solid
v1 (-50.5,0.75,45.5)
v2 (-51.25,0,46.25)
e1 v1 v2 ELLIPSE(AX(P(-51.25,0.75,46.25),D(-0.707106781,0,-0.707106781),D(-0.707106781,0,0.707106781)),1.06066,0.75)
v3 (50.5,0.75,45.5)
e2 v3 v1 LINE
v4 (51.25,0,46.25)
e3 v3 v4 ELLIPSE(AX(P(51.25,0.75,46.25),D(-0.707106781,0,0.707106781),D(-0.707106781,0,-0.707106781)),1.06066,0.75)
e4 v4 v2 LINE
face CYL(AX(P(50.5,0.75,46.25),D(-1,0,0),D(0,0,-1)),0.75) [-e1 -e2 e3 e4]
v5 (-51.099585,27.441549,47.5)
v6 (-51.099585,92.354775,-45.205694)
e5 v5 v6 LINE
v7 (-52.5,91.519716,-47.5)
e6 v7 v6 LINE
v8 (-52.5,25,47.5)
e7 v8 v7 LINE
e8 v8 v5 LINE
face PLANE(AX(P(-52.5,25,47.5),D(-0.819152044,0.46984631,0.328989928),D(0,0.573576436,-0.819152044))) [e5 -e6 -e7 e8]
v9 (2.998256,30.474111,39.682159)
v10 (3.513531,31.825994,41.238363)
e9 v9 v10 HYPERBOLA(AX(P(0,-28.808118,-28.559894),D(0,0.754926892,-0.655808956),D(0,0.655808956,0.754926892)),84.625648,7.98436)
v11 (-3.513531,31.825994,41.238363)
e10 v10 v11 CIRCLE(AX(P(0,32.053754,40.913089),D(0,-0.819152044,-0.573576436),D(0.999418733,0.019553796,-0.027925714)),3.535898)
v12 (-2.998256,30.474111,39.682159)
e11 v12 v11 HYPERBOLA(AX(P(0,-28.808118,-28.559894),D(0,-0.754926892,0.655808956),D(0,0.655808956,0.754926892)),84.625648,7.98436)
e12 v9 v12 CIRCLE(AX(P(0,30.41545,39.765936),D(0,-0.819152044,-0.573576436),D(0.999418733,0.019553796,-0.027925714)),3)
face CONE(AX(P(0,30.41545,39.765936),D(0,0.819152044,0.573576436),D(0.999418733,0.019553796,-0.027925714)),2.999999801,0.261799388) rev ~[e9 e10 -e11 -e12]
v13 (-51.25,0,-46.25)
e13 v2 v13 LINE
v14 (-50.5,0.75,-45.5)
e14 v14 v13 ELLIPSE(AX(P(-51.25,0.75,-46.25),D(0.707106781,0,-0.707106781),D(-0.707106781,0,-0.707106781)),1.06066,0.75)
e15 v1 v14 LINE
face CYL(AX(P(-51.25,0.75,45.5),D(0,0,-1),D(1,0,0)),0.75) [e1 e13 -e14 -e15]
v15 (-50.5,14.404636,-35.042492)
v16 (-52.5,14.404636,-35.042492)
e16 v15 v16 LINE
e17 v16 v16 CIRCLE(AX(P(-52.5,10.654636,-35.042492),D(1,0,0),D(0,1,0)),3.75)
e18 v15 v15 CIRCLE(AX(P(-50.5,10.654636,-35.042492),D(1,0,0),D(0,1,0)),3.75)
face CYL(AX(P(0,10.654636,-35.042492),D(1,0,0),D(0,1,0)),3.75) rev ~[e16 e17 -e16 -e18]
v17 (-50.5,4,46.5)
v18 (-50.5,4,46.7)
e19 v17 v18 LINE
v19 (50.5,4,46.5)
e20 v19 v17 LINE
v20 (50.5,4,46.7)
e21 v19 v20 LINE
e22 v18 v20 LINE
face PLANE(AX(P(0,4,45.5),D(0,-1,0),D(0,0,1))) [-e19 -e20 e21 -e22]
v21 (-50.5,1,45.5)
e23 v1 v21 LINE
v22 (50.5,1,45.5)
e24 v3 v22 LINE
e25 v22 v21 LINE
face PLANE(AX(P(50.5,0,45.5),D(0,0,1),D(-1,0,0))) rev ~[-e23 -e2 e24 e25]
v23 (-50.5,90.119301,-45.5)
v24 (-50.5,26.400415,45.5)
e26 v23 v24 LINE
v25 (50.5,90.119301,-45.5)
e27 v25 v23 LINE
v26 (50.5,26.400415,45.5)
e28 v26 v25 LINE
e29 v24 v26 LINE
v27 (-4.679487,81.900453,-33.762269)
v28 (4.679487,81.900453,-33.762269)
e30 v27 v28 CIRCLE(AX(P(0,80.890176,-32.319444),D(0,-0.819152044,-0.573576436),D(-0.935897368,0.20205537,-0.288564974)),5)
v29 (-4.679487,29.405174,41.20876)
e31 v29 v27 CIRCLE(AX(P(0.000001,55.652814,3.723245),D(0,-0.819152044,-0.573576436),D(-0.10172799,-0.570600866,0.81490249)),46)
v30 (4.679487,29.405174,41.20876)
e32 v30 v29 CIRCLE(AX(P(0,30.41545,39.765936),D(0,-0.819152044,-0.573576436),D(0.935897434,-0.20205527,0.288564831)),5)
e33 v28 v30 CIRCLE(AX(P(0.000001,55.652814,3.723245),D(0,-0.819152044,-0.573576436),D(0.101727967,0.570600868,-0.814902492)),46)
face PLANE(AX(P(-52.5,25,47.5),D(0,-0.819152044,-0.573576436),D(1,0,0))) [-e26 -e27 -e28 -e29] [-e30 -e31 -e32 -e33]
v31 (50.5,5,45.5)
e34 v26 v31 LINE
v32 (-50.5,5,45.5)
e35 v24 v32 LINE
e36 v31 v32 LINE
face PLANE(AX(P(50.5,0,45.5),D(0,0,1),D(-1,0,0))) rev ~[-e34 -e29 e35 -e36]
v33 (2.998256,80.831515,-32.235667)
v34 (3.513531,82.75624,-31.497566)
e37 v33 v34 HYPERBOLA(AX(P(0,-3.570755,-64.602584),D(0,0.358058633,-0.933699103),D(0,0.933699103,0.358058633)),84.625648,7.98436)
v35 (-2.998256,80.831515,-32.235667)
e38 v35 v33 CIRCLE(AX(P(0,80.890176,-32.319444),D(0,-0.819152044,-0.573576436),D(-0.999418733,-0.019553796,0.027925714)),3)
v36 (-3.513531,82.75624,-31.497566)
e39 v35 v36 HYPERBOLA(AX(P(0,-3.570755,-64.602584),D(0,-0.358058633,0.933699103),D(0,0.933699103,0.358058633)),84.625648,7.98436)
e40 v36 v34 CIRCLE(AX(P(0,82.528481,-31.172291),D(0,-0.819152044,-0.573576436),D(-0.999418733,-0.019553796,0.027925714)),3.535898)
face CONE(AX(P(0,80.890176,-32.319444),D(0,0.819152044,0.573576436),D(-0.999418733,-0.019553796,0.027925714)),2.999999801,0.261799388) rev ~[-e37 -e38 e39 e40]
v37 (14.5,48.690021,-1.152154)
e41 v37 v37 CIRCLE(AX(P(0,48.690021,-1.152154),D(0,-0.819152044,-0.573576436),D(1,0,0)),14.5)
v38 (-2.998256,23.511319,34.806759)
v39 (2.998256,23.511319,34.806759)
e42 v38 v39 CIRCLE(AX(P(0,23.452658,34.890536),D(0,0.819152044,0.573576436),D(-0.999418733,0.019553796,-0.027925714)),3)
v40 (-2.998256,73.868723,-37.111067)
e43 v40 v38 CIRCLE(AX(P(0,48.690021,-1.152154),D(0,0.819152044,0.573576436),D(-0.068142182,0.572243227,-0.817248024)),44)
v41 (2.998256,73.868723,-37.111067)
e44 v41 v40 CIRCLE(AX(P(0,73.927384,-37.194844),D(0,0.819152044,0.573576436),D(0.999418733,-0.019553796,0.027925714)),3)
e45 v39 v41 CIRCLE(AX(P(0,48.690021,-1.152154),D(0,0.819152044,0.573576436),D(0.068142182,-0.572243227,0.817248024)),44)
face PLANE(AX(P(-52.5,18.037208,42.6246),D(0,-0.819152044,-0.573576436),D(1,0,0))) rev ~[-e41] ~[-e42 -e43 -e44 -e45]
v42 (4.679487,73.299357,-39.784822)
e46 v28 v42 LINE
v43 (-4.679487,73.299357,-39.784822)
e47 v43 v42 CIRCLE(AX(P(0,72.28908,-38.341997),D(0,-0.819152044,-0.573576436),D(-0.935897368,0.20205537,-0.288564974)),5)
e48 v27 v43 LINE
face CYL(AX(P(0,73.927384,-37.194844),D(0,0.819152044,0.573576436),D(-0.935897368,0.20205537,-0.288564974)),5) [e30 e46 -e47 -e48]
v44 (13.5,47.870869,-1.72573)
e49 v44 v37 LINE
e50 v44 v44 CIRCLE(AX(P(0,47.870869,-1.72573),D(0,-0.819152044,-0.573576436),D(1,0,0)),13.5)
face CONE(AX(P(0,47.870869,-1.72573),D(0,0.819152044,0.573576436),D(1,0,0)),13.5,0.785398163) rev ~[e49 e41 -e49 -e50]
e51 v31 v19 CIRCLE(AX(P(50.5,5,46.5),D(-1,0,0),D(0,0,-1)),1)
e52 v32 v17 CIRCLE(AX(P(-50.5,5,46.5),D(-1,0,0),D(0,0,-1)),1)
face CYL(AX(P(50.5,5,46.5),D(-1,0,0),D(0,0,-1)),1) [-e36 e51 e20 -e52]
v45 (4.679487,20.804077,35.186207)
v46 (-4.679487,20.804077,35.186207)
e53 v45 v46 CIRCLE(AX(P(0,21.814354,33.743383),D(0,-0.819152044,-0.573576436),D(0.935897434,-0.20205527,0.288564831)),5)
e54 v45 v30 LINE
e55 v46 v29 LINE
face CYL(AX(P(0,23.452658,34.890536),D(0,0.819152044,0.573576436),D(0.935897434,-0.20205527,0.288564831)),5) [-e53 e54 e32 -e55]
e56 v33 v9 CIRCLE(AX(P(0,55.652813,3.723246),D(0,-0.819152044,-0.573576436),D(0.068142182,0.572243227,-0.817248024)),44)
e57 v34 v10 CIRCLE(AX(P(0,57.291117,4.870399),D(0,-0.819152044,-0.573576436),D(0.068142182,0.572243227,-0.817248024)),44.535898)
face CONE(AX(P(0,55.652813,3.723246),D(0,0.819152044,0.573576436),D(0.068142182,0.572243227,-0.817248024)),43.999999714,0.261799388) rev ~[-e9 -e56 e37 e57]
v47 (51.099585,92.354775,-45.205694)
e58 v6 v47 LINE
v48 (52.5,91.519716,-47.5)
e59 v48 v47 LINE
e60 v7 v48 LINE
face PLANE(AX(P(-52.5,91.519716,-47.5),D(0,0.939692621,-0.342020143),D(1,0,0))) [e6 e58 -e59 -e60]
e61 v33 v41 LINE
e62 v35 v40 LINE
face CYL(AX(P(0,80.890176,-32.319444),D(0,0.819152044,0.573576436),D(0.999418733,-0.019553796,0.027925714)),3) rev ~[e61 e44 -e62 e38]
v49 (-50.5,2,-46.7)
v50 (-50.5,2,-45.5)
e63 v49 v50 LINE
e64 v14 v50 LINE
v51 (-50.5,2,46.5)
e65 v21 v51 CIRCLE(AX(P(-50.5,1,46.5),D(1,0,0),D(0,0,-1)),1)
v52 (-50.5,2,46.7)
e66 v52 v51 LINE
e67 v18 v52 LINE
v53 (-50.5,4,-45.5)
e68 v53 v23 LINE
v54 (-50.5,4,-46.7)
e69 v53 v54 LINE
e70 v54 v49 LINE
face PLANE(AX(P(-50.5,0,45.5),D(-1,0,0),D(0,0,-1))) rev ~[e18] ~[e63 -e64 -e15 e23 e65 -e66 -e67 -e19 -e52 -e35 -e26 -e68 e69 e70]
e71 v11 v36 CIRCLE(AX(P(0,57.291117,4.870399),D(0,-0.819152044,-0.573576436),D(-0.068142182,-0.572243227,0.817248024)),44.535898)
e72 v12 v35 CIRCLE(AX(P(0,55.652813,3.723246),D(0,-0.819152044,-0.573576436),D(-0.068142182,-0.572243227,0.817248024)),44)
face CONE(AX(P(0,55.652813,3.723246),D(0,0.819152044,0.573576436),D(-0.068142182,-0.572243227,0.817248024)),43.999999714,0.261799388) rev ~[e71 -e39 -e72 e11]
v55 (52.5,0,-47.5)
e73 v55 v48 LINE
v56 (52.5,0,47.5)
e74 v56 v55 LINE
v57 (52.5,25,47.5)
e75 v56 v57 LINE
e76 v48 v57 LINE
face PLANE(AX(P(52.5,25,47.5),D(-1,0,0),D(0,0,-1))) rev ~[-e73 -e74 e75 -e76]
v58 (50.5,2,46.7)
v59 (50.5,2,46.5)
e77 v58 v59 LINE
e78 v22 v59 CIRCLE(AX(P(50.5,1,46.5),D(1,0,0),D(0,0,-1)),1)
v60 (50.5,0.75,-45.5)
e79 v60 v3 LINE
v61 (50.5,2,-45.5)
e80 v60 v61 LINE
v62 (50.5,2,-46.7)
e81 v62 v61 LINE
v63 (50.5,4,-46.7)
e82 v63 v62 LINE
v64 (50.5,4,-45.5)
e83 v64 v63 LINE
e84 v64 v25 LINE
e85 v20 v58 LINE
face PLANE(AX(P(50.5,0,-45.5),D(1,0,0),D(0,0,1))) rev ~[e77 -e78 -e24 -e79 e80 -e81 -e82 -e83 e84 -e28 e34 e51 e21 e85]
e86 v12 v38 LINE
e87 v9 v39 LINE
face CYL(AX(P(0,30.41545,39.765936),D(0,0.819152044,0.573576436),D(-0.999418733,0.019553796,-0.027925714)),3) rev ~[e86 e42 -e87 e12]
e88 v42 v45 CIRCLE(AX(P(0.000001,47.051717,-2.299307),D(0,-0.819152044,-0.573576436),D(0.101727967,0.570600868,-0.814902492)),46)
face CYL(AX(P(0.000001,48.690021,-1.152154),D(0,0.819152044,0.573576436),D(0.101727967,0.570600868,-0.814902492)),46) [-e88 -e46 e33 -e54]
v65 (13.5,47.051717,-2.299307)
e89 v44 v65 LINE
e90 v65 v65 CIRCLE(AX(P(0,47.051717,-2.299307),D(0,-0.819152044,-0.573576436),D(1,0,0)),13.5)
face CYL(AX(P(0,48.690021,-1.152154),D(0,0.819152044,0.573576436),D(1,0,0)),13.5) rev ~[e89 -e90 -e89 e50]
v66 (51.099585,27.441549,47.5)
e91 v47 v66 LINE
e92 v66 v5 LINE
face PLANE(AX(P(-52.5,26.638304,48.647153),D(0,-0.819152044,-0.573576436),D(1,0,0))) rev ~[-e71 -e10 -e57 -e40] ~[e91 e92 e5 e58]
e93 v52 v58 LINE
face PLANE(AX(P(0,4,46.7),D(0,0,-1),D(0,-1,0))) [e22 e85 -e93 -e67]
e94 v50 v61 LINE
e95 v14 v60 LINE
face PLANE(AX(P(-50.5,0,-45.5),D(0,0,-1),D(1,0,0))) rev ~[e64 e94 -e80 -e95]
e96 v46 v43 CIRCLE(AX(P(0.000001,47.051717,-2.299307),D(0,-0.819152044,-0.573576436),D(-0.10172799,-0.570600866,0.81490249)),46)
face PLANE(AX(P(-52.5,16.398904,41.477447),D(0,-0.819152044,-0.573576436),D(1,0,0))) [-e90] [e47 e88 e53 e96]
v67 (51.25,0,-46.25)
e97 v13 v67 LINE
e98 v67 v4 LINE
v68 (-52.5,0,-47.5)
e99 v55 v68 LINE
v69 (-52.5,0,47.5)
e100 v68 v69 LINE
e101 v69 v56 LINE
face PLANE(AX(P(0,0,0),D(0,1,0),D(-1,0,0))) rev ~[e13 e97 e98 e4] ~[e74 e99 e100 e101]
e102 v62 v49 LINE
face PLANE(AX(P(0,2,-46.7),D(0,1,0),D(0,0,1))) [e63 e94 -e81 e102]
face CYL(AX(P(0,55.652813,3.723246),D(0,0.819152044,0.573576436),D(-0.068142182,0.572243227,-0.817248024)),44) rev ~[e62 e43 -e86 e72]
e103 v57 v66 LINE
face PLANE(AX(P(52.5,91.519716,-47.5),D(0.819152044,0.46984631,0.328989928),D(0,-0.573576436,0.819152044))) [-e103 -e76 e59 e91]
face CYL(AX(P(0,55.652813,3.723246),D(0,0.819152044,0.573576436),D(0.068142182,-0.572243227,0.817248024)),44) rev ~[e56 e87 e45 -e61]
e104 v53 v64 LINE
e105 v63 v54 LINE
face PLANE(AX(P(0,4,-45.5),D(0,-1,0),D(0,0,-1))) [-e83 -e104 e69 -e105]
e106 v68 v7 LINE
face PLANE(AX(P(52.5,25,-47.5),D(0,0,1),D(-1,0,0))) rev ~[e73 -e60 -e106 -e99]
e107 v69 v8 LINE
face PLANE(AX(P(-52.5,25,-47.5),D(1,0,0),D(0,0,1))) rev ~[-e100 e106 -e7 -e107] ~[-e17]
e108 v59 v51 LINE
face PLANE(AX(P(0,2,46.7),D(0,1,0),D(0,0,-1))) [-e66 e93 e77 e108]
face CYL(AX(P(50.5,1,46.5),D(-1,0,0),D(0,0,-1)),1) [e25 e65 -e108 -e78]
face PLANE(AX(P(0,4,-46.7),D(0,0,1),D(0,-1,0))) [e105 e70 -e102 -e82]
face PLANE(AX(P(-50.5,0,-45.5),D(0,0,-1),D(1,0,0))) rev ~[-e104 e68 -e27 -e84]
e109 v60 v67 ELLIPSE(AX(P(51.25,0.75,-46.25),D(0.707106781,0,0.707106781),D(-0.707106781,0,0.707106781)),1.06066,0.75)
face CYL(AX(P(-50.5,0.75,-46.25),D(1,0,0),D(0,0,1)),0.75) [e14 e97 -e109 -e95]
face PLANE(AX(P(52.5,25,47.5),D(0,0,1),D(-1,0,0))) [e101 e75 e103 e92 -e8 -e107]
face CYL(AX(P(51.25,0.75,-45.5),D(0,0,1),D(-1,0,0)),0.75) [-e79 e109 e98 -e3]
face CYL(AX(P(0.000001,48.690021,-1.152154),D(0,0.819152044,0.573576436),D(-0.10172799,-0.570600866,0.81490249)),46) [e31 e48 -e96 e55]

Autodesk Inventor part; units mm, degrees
ref_plane "YZ Plane" through (0, 0, 0) normal (1, 0, 0) x (0, 1, 0)
ref_plane "XZ Plane" through (0, 0, 0) normal (0, 1, 0) x (-1, 0, 0)
sketch "XZ_master" plane through (0, 0, 0) normal (0, 1, 0) x (-1, 0, 0)
  line L0 (52.5, -47.5) -> (-52.5, -47.5)
  line L1 (-52.5, -47.5) -> (-52.5, 47.5)
  line L2 (-52.5, 47.5) -> (52.5, 47.5)
  line L3 (52.5, 47.5) -> (52.5, -47.5)
  line L4 (52.5, -47.5) -> (-52.5, 47.5) construction
  line L5 (-52.5, -47.5) -> (52.5, 47.5) construction
  line L6 (50.5, -45.5) -> (-50.5, -45.5)
  line L7 (-50.5, -45.5) -> (-50.5, 45.5)
  line L8 (-50.5, 45.5) -> (50.5, 45.5)
  line L9 (50.5, 45.5) -> (50.5, -45.5)
  point P0 (0, 0)
  dimension "d0" = 105
  dimension "d1" = 95
  dimension "d2" = 2
sketch "XZ_master outline for Walls_bottom" plane through (0, 0, 0) normal (0, 1, 0) x (-1, 0, 0)
  line L0 (52.5, -47.5) -> (52.5, 47.5)
  line L1 (-52.5, -47.5) -> (52.5, -47.5)
  line L2 (52.5, 47.5) -> (-52.5, 47.5)
  line L3 (-52.5, 47.5) -> (-52.5, -47.5)
  line L4 (50.5, -45.5) -> (-50.5, -45.5)
  line L5 (50.5, 45.5) -> (50.5, -45.5)
  line L6 (-50.5, 45.5) -> (50.5, 45.5)
  line L7 (-50.5, -45.5) -> (-50.5, 45.5)
extrude "Walls_bottom" add sketch "XZ_master outline for Walls_bottom" along normal blind 25
fillet "Fillet2" radius 0.75 4 edges at (0, 0, 45.5) (50.5, 0, 0) (-50.5, 0, 0) (0, 0, -45.5)
sketch "Profile" plane through (0, 0, 0) normal (1, 0, 0) x (0, 1, 0)
  line L0 (0, 45.5) -> (25, 45.5)
  line L1 (2, 45.5) -> (4, 45.5)
  line L2 (4, 45.5) -> (4, 46.7)
  line L3 (4, 46.7) -> (2, 46.7)
  line L4 (2, 46.7) -> (2, 45.5)
  line L5 (0, -47.5) -> (0, 47.5)
  circle A0 centre (10.654636, -35.042492) radius 3.75
  line L6 (4, 46.7) -> (4, -38.2) construction
  line L7 (4, 46.7) -> (88.9, 46.7) construction
  point P0 (0, 0)
  dimension "d5" = 2
  dimension "d6" = 1.2
  dimension "d7" = 2
  dimension "d27" = 7.5
  dimension "d30" = 90
sketch "Profile outline for Lip recess" plane through (0, 0, 0) normal (1, 0, 0) x (0, 1, 0)
  line L0 (4, 46.7) -> (2, 46.7)
  line L1 (4, 45.5) -> (4, 46.7)
  line L2 (2, 45.5) -> (4, 45.5)
  line L3 (2, 46.7) -> (2, 45.5)
extrude "Lip recess" cut sketch "Profile outline for Lip recess" along normal mid plane 101
fillet "Lip_fillet" radius 1 2 edges at (0, 4, 45.5) (0, 2, 45.5)
pattern_circular "Circular Pattern1" count 2 over 360 about axis through (0, -10, 0) along (0, 1, 0) of "Lip recess"
ref_plane "Angled_top_face" through (-52.5, 25, 47.5) normal (0, -0.819152, -0.5735764) x (1, 0, 0)
sketch "XZ_master outline for Walls_to_workplane" plane through (0, 0, 0) normal (0, 1, 0) x (-1, 0, 0)
  line L0 (52.5, -47.5) -> (52.5, 47.5)
  line L1 (-52.5, -47.5) -> (52.5, -47.5)
  line L2 (52.5, 47.5) -> (-52.5, 47.5)
  line L3 (-52.5, 47.5) -> (-52.5, -47.5)
  line L4 (50.5, -45.5) -> (-50.5, -45.5)
  line L5 (50.5, 45.5) -> (50.5, -45.5)
  line L6 (-50.5, 45.5) -> (50.5, 45.5)
  line L7 (-50.5, -45.5) -> (-50.5, 45.5)
extrude "Walls_to_workplane" add sketch "XZ_master outline for Walls_to_workplane" along normal up to surface from surface at 25 surface through (-52.5, 25, 47.5) normal (0, -0.819152, -0.5735764)
sketch "Top_face" plane through (-52.5, 25, 47.5) normal (0, -0.819152, -0.5735764) x (1, 0, 0)
  line L0 (105, -115.973586) -> (0, -115.973586)
  line L1 (0, 0) -> (105, 0)
  line L2 (105, 0) -> (105, -115.973586)
  line L3 (105, -115.973586) -> (0, -115.973586)
  line L4 (0, -115.973586) -> (0, 0)
  line L5 (0, -115.973586) -> (0, 0) construction
  line L6 (2, -2.441549) -> (2, -113.532037)
  line L7 (2, -113.532037) -> (103, -113.532037)
  line L8 (103, -113.532037) -> (103, -2.441549)
  line L9 (103, -2.441549) -> (2, -2.441549)
  line L10 (105, 0) -> (105, -115.973586)
  line L11 (105, -115.973586) -> (0, -115.973586)
  line L12 (0, -115.973586) -> (0, 0)
  line L13 (0, 0) -> (105, 0)
  line L14 (2, -113.532037) -> (103, -113.532037) construction
  line L15 (52.5, -113.532037) -> (52.5, -2.441549) construction
  line L16 (103, -2.441549) -> (2, -2.441549) construction
  circle A0 centre (52.5, -53.441549) radius 44
  circle A1 centre (52.5, -97.441549) radius 3
  circle A2 centre (52.5, -9.441549) radius 3
  circle A3 centre (52.5, -53.441549) radius 46
  circle A4 centre (52.5, -97.441549) radius 5
  circle A5 centre (52.5, -9.441549) radius 5
  circle A6 centre (52.5, -53.441549) radius 13.5
  circle A7 centre (52.5, -53.441549) radius 51 construction
  point P0 (55.498256, -97.339276)
  point P1 (55.498256, -9.543822)
  point P2 (49.501744, -9.543822)
  point P3 (49.501744, -97.339276)
  point P4 (47.820513, -99.202913)
  point P5 (57.179487, -99.202913)
  point P6 (57.179487, -7.680186)
  point P7 (47.820513, -7.680186)
  dimension "d61" = 88
  dimension "d62" = 51
  dimension "d63" = 6
  dimension "d64" = 6
  dimension "d65" = 2
  dimension "d66" = 2
  dimension "d67" = 2
  dimension "d68" = 27
  dimension "d69" = 102
sketch "Top_face outline for Face" plane through (-52.5, 25, 47.5) normal (0, -0.819152, -0.5735764) x (1, 0, 0)
  line L0 (105, -115.973586) -> (105, 0)
  line L1 (0, -115.973586) -> (105, -115.973586)
  line L2 (0, 0) -> (0, -115.973586)
  line L3 (105, 0) -> (0, 0)
extrude "Face" add sketch "Top_face outline for Face" against normal blind 2 draft -35
sketch "Top_face outline for Button_recess" plane through (-52.5, 25, 47.5) normal (0, -0.819152, -0.5735764) x (1, 0, 0)
  arc A0 (49.501744, -97.339276) -> (55.498256, -97.339276) centre (52.5, -97.441549) ccw
  arc A1 (49.501744, -9.543822) -> (49.501744, -97.339276) centre (52.5, -53.441549) ccw
  arc A2 (55.498256, -9.543822) -> (49.501744, -9.543822) centre (52.5, -9.441549) ccw
  arc A3 (55.498256, -97.339276) -> (55.498256, -9.543822) centre (52.5, -53.441549) ccw
extrude "Button_recess" cut sketch "Top_face outline for Button_recess" against normal through all draft 15
sketch "Profile outline for Side_cable_cutout" plane through (0, 0, 0) normal (1, 0, 0) x (0, 1, 0)
  circle A0 centre (10.654636, -35.042492) radius 3.75
extrude "Side_cable_cutout" cut sketch "Profile outline for Side_cable_cutout" against normal through all
sketch "Top_face outline for Recess_walls" plane through (-52.5, 25, 47.5) normal (0, -0.819152, -0.5735764) x (1, 0, 0)
  arc A0 (47.820513, -99.202913) -> (57.179487, -99.202913) centre (52.5, -97.441549) ccw
  arc A1 (47.820513, -7.680186) -> (47.820513, -99.202913) centre (52.5, -53.441549) ccw
  arc A2 (57.179487, -99.202913) -> (57.179487, -7.680186) centre (52.5, -53.441549) ccw
  arc A3 (57.179487, -7.680186) -> (47.820513, -7.680186) centre (52.5, -9.441549) ccw
  arc A4 (55.498256, -97.339276) -> (49.501744, -97.339276) centre (52.5, -97.441549) cw
  arc A5 (55.498256, -9.543822) -> (55.498256, -97.339276) centre (52.5, -53.441549) cw
  arc A6 (49.501744, -9.543822) -> (55.498256, -9.543822) centre (52.5, -9.441549) cw
  arc A7 (49.501744, -97.339276) -> (49.501744, -9.543822) centre (52.5, -53.441549) cw
extrude "Recess_walls" add sketch "Top_face outline for Recess_walls" along normal blind 8.5
sketch "Top_face outline for Recess_floor" plane through (-52.5, 25, 47.5) normal (0, -0.819152, -0.5735764) x (1, 0, 0)
  arc A0 (47.820513, -99.202913) -> (57.179487, -99.202913) centre (52.5, -97.441549) ccw
  arc A1 (47.820513, -7.680186) -> (47.820513, -99.202913) centre (52.5, -53.441549) ccw
  arc A2 (57.179487, -99.202913) -> (57.179487, -7.680186) centre (52.5, -53.441549) ccw
  arc A3 (57.179487, -7.680186) -> (47.820513, -7.680186) centre (52.5, -9.441549) ccw
  circle A4 centre (52.5, -53.441549) radius 13.5
extrude "Recess_floor" add sketch "Top_face outline for Recess_floor" along normal blind 2 from surface at 8.5
chamfer "Button_cutout_chamfer" distance 1 angle 45 1 edges at (-13.5, 48.69, -1.1522)
properties part number "BARB_top" material "ABS Plastic"
